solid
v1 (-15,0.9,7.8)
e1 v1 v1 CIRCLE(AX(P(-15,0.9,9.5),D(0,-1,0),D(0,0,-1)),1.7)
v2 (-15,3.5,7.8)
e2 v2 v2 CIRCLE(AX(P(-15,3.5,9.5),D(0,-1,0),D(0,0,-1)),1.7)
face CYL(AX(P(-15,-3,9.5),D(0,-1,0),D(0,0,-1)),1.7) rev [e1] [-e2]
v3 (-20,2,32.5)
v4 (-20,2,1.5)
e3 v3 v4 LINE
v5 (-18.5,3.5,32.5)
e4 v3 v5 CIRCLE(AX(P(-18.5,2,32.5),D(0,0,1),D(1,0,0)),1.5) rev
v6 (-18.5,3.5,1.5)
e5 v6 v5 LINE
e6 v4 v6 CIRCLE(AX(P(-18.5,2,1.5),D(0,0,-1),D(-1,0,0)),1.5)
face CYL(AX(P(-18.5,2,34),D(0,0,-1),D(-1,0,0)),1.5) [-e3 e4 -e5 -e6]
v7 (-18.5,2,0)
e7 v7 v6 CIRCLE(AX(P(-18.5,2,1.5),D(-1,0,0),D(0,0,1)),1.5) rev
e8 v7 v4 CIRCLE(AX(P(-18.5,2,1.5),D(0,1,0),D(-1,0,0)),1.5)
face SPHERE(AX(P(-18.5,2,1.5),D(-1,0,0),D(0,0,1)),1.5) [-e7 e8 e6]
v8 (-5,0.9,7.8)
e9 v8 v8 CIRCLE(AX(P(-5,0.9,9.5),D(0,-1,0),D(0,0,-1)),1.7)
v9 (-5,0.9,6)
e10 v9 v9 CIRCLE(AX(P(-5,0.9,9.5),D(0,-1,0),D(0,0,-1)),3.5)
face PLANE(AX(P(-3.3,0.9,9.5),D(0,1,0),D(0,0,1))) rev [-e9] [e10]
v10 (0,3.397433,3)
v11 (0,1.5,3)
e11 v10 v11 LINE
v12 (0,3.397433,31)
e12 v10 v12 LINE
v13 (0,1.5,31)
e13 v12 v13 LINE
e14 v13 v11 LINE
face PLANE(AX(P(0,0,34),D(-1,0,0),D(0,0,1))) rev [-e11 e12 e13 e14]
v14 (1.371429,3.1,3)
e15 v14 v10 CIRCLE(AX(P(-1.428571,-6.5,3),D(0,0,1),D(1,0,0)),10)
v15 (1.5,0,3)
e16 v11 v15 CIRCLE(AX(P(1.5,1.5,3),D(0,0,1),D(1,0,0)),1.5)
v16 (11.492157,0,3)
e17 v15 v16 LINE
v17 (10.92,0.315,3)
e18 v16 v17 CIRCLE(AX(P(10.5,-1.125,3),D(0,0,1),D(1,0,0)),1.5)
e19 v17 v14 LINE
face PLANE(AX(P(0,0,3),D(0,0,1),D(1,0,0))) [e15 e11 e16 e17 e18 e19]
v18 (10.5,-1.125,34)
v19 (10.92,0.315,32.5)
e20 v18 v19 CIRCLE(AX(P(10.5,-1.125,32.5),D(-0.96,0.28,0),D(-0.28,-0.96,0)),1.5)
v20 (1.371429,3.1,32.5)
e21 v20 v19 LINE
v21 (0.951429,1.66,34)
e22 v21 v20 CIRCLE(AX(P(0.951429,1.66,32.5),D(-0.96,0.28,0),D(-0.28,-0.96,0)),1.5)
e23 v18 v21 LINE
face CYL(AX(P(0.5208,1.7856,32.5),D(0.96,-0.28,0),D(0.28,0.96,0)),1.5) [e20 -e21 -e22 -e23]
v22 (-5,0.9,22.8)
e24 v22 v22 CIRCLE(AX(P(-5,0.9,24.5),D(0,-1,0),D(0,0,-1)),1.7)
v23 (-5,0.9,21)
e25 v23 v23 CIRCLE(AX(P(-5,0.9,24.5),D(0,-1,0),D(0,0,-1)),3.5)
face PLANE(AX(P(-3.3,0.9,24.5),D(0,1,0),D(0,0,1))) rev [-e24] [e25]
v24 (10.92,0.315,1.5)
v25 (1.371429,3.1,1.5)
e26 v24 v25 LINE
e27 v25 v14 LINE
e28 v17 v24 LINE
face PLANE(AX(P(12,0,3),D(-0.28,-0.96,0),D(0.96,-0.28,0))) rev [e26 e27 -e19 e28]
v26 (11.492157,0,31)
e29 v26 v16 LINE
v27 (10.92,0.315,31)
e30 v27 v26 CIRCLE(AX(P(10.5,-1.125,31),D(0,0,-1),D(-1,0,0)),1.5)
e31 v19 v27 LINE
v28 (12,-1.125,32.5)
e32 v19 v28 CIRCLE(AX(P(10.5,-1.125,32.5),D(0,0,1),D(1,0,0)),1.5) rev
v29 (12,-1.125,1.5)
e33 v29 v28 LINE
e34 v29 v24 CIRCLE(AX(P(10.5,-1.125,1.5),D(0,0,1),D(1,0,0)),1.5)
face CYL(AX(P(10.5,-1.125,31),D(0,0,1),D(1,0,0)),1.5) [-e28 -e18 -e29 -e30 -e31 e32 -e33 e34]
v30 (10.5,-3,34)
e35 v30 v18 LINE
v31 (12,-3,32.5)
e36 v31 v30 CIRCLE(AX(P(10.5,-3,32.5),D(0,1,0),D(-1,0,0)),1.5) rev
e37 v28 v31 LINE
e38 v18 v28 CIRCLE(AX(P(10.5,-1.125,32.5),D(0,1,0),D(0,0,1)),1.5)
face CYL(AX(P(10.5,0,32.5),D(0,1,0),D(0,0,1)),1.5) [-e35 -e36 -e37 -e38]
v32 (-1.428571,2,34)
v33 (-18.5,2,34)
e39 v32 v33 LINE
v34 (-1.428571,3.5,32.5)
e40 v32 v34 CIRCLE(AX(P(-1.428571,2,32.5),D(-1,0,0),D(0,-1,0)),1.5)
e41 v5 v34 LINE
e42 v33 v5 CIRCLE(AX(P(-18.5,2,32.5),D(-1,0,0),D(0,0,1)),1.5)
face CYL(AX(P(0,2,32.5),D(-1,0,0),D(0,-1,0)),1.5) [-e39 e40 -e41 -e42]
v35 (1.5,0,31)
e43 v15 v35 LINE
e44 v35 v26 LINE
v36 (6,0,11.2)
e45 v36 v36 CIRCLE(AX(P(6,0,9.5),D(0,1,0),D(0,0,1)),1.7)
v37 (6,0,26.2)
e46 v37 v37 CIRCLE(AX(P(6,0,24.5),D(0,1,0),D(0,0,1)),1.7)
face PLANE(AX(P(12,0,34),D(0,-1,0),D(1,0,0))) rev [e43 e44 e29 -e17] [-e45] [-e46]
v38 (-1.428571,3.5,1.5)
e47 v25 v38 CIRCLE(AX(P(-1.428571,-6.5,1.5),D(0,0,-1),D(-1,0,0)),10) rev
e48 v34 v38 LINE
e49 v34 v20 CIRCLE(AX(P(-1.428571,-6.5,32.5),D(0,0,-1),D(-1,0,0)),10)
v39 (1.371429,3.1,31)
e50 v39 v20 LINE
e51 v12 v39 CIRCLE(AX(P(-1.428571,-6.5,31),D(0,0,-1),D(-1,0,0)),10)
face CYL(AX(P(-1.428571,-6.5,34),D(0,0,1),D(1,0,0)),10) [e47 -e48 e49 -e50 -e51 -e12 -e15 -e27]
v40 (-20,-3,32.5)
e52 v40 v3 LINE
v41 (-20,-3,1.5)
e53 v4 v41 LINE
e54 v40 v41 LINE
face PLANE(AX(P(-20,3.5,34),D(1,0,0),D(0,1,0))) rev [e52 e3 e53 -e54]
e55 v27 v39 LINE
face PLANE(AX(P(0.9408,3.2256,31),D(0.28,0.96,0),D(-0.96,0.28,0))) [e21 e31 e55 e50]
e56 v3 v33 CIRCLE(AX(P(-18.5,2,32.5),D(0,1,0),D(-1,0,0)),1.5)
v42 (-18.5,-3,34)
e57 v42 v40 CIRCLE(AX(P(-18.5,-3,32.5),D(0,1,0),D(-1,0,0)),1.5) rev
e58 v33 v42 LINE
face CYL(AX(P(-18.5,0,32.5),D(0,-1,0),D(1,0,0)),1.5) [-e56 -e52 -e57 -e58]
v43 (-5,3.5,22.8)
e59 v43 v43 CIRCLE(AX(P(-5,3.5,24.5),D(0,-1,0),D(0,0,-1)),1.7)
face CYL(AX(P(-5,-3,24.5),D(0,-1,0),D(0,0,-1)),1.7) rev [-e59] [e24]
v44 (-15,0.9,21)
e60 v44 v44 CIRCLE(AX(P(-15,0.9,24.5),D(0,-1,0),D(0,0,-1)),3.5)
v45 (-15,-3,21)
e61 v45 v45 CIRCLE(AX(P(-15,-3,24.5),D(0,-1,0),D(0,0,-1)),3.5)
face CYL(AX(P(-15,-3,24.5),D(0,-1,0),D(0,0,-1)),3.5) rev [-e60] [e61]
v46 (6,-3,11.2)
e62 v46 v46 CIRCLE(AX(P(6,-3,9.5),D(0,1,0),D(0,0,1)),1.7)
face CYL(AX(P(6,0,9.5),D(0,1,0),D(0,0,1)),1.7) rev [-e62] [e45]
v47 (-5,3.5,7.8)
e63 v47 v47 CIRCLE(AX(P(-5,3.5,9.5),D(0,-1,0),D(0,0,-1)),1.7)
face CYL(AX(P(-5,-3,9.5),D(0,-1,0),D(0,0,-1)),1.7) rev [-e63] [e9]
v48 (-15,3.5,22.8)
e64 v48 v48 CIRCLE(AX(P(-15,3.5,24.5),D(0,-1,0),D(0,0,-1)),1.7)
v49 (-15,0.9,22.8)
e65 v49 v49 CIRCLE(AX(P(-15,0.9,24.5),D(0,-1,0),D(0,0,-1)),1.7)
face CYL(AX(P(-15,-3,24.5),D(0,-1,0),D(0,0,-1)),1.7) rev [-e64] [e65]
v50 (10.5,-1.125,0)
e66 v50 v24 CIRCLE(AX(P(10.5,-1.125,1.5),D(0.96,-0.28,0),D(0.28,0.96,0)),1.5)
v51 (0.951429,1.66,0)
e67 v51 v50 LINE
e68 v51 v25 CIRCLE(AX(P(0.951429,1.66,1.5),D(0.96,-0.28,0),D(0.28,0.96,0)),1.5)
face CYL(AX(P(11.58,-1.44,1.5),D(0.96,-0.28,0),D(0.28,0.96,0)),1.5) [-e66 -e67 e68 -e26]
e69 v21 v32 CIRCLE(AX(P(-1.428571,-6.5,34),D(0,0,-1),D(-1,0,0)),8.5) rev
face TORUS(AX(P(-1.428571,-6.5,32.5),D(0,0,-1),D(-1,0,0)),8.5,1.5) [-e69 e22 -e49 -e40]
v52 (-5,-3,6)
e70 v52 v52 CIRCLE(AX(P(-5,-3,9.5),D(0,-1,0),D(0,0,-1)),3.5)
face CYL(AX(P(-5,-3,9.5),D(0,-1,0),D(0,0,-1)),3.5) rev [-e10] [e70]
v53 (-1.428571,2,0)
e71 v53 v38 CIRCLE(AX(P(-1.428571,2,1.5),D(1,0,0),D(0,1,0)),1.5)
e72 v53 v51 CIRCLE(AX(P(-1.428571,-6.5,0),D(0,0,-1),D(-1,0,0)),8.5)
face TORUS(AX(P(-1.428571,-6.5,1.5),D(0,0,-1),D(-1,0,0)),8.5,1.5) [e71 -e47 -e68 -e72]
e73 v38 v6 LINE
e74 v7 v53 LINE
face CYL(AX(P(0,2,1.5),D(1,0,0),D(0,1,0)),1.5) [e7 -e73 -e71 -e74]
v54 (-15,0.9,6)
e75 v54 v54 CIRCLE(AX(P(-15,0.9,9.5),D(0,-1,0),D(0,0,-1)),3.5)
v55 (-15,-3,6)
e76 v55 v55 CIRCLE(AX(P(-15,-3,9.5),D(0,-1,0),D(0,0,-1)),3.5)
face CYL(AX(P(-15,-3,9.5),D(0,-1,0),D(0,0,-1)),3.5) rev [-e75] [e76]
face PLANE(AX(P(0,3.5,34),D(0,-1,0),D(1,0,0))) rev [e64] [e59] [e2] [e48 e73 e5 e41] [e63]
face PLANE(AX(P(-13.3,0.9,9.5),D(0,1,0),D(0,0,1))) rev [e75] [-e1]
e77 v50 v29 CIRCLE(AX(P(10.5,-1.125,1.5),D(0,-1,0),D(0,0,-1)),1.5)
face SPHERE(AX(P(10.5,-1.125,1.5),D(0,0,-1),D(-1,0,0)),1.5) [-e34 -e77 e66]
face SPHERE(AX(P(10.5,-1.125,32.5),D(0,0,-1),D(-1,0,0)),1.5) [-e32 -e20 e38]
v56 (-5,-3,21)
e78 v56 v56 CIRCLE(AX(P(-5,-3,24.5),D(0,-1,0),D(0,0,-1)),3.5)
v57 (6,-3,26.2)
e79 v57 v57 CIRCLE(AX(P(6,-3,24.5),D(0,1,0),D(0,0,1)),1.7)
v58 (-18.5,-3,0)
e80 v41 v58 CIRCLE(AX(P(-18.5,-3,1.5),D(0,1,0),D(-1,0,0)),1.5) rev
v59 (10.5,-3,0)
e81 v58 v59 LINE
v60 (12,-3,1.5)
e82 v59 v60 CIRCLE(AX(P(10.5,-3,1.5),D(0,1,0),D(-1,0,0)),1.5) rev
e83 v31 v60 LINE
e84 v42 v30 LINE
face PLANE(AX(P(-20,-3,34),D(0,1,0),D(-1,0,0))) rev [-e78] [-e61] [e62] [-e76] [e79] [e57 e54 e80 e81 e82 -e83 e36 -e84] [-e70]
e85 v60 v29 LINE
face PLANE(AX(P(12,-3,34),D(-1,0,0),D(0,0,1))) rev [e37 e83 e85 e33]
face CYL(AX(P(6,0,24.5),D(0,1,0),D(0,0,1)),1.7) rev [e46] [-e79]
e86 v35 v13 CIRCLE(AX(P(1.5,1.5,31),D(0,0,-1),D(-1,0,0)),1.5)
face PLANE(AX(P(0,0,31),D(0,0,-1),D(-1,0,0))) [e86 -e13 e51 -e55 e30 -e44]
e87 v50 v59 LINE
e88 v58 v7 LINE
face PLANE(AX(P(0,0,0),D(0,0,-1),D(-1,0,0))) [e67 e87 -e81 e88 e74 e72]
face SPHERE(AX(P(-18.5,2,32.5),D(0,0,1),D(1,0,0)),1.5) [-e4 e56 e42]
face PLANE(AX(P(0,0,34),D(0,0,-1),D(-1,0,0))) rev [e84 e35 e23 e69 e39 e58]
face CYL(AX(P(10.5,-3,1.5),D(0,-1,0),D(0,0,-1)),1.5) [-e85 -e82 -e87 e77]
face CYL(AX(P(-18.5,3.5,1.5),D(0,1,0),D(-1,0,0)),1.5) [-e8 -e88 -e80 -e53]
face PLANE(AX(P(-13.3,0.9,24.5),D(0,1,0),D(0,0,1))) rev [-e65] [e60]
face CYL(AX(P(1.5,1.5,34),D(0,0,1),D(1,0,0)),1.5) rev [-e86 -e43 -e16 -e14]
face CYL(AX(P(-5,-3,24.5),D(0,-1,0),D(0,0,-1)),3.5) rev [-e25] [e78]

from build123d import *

# Parameters (mm, degrees)
PROFILE_EXTRUDE_DEPTH               = 34
GUSSET_1_EXTRUDE_DEPTH              = 3
GUSSET_START                        = 31
GUSSET_2_EXTRUDE_DEPTH              = 3
SOLENOID_MOUNTING_HOLES_D           = 3.4
SOLENOID_MOUNTING_HOLES_CBORE_D     = 7
SOLENOID_MOUNTING_HOLES_CBORE_DEPTH = 3.9
M3_MOUNTING_HOLES_D                 = 3.4
FRONT_START                         = -1
FRONT_EDGE_FILLETS_DEPTH            = 36
FRONT_EDGE_FILLETS_2_DEPTH          = 34
TOP_START                           = -1
TOP_EDGE_FILLET_DEPTH               = 36
CORNER_FILLETS_R                    = 1.5


with BuildPart() as part:
    # Profile Sketch → Profile  Extrude (new body)
    with BuildSketch(Plane.XY):
        Polygon((0, 0), (0, 3.5), (-20, 3.5), (-20, -3), (12, -3), (12, 0), align=None)
    extrude(amount=PROFILE_EXTRUDE_DEPTH)

    # Gusset Sketch → Gusset 1 Extrude (add)
    with BuildSketch(Plane.XY):
        Polygon((0, 0), (12, 0), (0, 3.5), align=None)
    extrude(amount=GUSSET_1_EXTRUDE_DEPTH)

    # Gusset Sketch<2> → Gusset 2 Extrude (add)
    with BuildSketch(Plane.XY.offset(GUSSET_START)):
        Polygon((0, 0), (12, 0), (0, 3.5), align=None)
    extrude(amount=GUSSET_2_EXTRUDE_DEPTH)

    # Solenoid Mounting Holes (through all)
    with Locations(Plane(origin=(-3, -3, 0), x_dir=(0, 0, -1), z_dir=(0, -1, 0))):
        with Locations((-9.5, -12), (-24.5, -12), (-24.5, -2), (-9.5, -2)):
            CounterBoreHole(SOLENOID_MOUNTING_HOLES_D / 2, SOLENOID_MOUNTING_HOLES_CBORE_D / 2, SOLENOID_MOUNTING_HOLES_CBORE_DEPTH)

    # M3 Mounting Holes (through all)
    with Locations(Plane(origin=(0, 0, 0), x_dir=(1, 0, 0), z_dir=(0, 1, 0))):
        with Locations((6, -24.5), (6, -9.5)):
            Hole(M3_MOUNTING_HOLES_D / 2)

    # Front Edge Fillets: read off the stored shape, not the designer's step
    # Front Edge Fillets outline → Front Edge Fillets (cut)
    with BuildSketch(Plane.XY.offset(FRONT_START)):
        with BuildLine():
            Line((12, -1.125), (12, 0))
            Line((12, 0), (10.92, 0.315))
            ThreePointArc((10.92, 0.315), (11.7, -0.225), (12, -1.125))
        make_face()
    extrude(amount=FRONT_EDGE_FILLETS_DEPTH, mode=Mode.SUBTRACT)

    # Front Edge Fillets 2 outline → Front Edge Fillets 2 (add)
    with BuildSketch(Plane.XY):
        with BuildLine():
            ThreePointArc((1.5, 0), (0.439339828, 0.439339828), (0, 1.5))
            Line((0, 1.5), (0, 0))
            Line((0, 0), (1.5, 0))
        make_face()
    extrude(amount=FRONT_EDGE_FILLETS_2_DEPTH)

    # Top Edge Fillet: read off the stored shape, not the designer's step
    # Top Edge Fillet outline → Top Edge Fillet (cut)
    with BuildSketch(Plane.XY.offset(TOP_START)):
        with BuildLine():
            Line((1.371428571, 3.1), (0, 3.5))
            Line((0, 3.5), (-1.428571429, 3.5))
            ThreePointArc((-1.428571429, 3.5), (-0.014357867, 3.399494937), (1.371428571, 3.1))
        make_face()
    extrude(amount=TOP_EDGE_FILLET_DEPTH, mode=Mode.SUBTRACT)

    # Corner Fillets
    corner_fillets_edges = [part.edges().sort_by_distance(p)[0] for p in [
        (-10.714285714, 3.5, 0),
        (-10.714285714, 3.5, 34),
        (-0.014357867, 3.399494937, 0),
        (-0.014357867, 3.399494937, 34),
        (-20, 3.5, 17),
        (-20, 0.25, 34),
        (12, -2.0625, 34),
        (12, -2.0625, 0),
        (-20, 0.25, 0),
        (6.145714286, 1.7075, 0),
        (11.7, -0.225, 0),
        (6.145714286, 1.7075, 34),
        (11.7, -0.225, 34),
    ]]
    fillet(corner_fillets_edges, radius=CORNER_FILLETS_R)


solid = part.part
